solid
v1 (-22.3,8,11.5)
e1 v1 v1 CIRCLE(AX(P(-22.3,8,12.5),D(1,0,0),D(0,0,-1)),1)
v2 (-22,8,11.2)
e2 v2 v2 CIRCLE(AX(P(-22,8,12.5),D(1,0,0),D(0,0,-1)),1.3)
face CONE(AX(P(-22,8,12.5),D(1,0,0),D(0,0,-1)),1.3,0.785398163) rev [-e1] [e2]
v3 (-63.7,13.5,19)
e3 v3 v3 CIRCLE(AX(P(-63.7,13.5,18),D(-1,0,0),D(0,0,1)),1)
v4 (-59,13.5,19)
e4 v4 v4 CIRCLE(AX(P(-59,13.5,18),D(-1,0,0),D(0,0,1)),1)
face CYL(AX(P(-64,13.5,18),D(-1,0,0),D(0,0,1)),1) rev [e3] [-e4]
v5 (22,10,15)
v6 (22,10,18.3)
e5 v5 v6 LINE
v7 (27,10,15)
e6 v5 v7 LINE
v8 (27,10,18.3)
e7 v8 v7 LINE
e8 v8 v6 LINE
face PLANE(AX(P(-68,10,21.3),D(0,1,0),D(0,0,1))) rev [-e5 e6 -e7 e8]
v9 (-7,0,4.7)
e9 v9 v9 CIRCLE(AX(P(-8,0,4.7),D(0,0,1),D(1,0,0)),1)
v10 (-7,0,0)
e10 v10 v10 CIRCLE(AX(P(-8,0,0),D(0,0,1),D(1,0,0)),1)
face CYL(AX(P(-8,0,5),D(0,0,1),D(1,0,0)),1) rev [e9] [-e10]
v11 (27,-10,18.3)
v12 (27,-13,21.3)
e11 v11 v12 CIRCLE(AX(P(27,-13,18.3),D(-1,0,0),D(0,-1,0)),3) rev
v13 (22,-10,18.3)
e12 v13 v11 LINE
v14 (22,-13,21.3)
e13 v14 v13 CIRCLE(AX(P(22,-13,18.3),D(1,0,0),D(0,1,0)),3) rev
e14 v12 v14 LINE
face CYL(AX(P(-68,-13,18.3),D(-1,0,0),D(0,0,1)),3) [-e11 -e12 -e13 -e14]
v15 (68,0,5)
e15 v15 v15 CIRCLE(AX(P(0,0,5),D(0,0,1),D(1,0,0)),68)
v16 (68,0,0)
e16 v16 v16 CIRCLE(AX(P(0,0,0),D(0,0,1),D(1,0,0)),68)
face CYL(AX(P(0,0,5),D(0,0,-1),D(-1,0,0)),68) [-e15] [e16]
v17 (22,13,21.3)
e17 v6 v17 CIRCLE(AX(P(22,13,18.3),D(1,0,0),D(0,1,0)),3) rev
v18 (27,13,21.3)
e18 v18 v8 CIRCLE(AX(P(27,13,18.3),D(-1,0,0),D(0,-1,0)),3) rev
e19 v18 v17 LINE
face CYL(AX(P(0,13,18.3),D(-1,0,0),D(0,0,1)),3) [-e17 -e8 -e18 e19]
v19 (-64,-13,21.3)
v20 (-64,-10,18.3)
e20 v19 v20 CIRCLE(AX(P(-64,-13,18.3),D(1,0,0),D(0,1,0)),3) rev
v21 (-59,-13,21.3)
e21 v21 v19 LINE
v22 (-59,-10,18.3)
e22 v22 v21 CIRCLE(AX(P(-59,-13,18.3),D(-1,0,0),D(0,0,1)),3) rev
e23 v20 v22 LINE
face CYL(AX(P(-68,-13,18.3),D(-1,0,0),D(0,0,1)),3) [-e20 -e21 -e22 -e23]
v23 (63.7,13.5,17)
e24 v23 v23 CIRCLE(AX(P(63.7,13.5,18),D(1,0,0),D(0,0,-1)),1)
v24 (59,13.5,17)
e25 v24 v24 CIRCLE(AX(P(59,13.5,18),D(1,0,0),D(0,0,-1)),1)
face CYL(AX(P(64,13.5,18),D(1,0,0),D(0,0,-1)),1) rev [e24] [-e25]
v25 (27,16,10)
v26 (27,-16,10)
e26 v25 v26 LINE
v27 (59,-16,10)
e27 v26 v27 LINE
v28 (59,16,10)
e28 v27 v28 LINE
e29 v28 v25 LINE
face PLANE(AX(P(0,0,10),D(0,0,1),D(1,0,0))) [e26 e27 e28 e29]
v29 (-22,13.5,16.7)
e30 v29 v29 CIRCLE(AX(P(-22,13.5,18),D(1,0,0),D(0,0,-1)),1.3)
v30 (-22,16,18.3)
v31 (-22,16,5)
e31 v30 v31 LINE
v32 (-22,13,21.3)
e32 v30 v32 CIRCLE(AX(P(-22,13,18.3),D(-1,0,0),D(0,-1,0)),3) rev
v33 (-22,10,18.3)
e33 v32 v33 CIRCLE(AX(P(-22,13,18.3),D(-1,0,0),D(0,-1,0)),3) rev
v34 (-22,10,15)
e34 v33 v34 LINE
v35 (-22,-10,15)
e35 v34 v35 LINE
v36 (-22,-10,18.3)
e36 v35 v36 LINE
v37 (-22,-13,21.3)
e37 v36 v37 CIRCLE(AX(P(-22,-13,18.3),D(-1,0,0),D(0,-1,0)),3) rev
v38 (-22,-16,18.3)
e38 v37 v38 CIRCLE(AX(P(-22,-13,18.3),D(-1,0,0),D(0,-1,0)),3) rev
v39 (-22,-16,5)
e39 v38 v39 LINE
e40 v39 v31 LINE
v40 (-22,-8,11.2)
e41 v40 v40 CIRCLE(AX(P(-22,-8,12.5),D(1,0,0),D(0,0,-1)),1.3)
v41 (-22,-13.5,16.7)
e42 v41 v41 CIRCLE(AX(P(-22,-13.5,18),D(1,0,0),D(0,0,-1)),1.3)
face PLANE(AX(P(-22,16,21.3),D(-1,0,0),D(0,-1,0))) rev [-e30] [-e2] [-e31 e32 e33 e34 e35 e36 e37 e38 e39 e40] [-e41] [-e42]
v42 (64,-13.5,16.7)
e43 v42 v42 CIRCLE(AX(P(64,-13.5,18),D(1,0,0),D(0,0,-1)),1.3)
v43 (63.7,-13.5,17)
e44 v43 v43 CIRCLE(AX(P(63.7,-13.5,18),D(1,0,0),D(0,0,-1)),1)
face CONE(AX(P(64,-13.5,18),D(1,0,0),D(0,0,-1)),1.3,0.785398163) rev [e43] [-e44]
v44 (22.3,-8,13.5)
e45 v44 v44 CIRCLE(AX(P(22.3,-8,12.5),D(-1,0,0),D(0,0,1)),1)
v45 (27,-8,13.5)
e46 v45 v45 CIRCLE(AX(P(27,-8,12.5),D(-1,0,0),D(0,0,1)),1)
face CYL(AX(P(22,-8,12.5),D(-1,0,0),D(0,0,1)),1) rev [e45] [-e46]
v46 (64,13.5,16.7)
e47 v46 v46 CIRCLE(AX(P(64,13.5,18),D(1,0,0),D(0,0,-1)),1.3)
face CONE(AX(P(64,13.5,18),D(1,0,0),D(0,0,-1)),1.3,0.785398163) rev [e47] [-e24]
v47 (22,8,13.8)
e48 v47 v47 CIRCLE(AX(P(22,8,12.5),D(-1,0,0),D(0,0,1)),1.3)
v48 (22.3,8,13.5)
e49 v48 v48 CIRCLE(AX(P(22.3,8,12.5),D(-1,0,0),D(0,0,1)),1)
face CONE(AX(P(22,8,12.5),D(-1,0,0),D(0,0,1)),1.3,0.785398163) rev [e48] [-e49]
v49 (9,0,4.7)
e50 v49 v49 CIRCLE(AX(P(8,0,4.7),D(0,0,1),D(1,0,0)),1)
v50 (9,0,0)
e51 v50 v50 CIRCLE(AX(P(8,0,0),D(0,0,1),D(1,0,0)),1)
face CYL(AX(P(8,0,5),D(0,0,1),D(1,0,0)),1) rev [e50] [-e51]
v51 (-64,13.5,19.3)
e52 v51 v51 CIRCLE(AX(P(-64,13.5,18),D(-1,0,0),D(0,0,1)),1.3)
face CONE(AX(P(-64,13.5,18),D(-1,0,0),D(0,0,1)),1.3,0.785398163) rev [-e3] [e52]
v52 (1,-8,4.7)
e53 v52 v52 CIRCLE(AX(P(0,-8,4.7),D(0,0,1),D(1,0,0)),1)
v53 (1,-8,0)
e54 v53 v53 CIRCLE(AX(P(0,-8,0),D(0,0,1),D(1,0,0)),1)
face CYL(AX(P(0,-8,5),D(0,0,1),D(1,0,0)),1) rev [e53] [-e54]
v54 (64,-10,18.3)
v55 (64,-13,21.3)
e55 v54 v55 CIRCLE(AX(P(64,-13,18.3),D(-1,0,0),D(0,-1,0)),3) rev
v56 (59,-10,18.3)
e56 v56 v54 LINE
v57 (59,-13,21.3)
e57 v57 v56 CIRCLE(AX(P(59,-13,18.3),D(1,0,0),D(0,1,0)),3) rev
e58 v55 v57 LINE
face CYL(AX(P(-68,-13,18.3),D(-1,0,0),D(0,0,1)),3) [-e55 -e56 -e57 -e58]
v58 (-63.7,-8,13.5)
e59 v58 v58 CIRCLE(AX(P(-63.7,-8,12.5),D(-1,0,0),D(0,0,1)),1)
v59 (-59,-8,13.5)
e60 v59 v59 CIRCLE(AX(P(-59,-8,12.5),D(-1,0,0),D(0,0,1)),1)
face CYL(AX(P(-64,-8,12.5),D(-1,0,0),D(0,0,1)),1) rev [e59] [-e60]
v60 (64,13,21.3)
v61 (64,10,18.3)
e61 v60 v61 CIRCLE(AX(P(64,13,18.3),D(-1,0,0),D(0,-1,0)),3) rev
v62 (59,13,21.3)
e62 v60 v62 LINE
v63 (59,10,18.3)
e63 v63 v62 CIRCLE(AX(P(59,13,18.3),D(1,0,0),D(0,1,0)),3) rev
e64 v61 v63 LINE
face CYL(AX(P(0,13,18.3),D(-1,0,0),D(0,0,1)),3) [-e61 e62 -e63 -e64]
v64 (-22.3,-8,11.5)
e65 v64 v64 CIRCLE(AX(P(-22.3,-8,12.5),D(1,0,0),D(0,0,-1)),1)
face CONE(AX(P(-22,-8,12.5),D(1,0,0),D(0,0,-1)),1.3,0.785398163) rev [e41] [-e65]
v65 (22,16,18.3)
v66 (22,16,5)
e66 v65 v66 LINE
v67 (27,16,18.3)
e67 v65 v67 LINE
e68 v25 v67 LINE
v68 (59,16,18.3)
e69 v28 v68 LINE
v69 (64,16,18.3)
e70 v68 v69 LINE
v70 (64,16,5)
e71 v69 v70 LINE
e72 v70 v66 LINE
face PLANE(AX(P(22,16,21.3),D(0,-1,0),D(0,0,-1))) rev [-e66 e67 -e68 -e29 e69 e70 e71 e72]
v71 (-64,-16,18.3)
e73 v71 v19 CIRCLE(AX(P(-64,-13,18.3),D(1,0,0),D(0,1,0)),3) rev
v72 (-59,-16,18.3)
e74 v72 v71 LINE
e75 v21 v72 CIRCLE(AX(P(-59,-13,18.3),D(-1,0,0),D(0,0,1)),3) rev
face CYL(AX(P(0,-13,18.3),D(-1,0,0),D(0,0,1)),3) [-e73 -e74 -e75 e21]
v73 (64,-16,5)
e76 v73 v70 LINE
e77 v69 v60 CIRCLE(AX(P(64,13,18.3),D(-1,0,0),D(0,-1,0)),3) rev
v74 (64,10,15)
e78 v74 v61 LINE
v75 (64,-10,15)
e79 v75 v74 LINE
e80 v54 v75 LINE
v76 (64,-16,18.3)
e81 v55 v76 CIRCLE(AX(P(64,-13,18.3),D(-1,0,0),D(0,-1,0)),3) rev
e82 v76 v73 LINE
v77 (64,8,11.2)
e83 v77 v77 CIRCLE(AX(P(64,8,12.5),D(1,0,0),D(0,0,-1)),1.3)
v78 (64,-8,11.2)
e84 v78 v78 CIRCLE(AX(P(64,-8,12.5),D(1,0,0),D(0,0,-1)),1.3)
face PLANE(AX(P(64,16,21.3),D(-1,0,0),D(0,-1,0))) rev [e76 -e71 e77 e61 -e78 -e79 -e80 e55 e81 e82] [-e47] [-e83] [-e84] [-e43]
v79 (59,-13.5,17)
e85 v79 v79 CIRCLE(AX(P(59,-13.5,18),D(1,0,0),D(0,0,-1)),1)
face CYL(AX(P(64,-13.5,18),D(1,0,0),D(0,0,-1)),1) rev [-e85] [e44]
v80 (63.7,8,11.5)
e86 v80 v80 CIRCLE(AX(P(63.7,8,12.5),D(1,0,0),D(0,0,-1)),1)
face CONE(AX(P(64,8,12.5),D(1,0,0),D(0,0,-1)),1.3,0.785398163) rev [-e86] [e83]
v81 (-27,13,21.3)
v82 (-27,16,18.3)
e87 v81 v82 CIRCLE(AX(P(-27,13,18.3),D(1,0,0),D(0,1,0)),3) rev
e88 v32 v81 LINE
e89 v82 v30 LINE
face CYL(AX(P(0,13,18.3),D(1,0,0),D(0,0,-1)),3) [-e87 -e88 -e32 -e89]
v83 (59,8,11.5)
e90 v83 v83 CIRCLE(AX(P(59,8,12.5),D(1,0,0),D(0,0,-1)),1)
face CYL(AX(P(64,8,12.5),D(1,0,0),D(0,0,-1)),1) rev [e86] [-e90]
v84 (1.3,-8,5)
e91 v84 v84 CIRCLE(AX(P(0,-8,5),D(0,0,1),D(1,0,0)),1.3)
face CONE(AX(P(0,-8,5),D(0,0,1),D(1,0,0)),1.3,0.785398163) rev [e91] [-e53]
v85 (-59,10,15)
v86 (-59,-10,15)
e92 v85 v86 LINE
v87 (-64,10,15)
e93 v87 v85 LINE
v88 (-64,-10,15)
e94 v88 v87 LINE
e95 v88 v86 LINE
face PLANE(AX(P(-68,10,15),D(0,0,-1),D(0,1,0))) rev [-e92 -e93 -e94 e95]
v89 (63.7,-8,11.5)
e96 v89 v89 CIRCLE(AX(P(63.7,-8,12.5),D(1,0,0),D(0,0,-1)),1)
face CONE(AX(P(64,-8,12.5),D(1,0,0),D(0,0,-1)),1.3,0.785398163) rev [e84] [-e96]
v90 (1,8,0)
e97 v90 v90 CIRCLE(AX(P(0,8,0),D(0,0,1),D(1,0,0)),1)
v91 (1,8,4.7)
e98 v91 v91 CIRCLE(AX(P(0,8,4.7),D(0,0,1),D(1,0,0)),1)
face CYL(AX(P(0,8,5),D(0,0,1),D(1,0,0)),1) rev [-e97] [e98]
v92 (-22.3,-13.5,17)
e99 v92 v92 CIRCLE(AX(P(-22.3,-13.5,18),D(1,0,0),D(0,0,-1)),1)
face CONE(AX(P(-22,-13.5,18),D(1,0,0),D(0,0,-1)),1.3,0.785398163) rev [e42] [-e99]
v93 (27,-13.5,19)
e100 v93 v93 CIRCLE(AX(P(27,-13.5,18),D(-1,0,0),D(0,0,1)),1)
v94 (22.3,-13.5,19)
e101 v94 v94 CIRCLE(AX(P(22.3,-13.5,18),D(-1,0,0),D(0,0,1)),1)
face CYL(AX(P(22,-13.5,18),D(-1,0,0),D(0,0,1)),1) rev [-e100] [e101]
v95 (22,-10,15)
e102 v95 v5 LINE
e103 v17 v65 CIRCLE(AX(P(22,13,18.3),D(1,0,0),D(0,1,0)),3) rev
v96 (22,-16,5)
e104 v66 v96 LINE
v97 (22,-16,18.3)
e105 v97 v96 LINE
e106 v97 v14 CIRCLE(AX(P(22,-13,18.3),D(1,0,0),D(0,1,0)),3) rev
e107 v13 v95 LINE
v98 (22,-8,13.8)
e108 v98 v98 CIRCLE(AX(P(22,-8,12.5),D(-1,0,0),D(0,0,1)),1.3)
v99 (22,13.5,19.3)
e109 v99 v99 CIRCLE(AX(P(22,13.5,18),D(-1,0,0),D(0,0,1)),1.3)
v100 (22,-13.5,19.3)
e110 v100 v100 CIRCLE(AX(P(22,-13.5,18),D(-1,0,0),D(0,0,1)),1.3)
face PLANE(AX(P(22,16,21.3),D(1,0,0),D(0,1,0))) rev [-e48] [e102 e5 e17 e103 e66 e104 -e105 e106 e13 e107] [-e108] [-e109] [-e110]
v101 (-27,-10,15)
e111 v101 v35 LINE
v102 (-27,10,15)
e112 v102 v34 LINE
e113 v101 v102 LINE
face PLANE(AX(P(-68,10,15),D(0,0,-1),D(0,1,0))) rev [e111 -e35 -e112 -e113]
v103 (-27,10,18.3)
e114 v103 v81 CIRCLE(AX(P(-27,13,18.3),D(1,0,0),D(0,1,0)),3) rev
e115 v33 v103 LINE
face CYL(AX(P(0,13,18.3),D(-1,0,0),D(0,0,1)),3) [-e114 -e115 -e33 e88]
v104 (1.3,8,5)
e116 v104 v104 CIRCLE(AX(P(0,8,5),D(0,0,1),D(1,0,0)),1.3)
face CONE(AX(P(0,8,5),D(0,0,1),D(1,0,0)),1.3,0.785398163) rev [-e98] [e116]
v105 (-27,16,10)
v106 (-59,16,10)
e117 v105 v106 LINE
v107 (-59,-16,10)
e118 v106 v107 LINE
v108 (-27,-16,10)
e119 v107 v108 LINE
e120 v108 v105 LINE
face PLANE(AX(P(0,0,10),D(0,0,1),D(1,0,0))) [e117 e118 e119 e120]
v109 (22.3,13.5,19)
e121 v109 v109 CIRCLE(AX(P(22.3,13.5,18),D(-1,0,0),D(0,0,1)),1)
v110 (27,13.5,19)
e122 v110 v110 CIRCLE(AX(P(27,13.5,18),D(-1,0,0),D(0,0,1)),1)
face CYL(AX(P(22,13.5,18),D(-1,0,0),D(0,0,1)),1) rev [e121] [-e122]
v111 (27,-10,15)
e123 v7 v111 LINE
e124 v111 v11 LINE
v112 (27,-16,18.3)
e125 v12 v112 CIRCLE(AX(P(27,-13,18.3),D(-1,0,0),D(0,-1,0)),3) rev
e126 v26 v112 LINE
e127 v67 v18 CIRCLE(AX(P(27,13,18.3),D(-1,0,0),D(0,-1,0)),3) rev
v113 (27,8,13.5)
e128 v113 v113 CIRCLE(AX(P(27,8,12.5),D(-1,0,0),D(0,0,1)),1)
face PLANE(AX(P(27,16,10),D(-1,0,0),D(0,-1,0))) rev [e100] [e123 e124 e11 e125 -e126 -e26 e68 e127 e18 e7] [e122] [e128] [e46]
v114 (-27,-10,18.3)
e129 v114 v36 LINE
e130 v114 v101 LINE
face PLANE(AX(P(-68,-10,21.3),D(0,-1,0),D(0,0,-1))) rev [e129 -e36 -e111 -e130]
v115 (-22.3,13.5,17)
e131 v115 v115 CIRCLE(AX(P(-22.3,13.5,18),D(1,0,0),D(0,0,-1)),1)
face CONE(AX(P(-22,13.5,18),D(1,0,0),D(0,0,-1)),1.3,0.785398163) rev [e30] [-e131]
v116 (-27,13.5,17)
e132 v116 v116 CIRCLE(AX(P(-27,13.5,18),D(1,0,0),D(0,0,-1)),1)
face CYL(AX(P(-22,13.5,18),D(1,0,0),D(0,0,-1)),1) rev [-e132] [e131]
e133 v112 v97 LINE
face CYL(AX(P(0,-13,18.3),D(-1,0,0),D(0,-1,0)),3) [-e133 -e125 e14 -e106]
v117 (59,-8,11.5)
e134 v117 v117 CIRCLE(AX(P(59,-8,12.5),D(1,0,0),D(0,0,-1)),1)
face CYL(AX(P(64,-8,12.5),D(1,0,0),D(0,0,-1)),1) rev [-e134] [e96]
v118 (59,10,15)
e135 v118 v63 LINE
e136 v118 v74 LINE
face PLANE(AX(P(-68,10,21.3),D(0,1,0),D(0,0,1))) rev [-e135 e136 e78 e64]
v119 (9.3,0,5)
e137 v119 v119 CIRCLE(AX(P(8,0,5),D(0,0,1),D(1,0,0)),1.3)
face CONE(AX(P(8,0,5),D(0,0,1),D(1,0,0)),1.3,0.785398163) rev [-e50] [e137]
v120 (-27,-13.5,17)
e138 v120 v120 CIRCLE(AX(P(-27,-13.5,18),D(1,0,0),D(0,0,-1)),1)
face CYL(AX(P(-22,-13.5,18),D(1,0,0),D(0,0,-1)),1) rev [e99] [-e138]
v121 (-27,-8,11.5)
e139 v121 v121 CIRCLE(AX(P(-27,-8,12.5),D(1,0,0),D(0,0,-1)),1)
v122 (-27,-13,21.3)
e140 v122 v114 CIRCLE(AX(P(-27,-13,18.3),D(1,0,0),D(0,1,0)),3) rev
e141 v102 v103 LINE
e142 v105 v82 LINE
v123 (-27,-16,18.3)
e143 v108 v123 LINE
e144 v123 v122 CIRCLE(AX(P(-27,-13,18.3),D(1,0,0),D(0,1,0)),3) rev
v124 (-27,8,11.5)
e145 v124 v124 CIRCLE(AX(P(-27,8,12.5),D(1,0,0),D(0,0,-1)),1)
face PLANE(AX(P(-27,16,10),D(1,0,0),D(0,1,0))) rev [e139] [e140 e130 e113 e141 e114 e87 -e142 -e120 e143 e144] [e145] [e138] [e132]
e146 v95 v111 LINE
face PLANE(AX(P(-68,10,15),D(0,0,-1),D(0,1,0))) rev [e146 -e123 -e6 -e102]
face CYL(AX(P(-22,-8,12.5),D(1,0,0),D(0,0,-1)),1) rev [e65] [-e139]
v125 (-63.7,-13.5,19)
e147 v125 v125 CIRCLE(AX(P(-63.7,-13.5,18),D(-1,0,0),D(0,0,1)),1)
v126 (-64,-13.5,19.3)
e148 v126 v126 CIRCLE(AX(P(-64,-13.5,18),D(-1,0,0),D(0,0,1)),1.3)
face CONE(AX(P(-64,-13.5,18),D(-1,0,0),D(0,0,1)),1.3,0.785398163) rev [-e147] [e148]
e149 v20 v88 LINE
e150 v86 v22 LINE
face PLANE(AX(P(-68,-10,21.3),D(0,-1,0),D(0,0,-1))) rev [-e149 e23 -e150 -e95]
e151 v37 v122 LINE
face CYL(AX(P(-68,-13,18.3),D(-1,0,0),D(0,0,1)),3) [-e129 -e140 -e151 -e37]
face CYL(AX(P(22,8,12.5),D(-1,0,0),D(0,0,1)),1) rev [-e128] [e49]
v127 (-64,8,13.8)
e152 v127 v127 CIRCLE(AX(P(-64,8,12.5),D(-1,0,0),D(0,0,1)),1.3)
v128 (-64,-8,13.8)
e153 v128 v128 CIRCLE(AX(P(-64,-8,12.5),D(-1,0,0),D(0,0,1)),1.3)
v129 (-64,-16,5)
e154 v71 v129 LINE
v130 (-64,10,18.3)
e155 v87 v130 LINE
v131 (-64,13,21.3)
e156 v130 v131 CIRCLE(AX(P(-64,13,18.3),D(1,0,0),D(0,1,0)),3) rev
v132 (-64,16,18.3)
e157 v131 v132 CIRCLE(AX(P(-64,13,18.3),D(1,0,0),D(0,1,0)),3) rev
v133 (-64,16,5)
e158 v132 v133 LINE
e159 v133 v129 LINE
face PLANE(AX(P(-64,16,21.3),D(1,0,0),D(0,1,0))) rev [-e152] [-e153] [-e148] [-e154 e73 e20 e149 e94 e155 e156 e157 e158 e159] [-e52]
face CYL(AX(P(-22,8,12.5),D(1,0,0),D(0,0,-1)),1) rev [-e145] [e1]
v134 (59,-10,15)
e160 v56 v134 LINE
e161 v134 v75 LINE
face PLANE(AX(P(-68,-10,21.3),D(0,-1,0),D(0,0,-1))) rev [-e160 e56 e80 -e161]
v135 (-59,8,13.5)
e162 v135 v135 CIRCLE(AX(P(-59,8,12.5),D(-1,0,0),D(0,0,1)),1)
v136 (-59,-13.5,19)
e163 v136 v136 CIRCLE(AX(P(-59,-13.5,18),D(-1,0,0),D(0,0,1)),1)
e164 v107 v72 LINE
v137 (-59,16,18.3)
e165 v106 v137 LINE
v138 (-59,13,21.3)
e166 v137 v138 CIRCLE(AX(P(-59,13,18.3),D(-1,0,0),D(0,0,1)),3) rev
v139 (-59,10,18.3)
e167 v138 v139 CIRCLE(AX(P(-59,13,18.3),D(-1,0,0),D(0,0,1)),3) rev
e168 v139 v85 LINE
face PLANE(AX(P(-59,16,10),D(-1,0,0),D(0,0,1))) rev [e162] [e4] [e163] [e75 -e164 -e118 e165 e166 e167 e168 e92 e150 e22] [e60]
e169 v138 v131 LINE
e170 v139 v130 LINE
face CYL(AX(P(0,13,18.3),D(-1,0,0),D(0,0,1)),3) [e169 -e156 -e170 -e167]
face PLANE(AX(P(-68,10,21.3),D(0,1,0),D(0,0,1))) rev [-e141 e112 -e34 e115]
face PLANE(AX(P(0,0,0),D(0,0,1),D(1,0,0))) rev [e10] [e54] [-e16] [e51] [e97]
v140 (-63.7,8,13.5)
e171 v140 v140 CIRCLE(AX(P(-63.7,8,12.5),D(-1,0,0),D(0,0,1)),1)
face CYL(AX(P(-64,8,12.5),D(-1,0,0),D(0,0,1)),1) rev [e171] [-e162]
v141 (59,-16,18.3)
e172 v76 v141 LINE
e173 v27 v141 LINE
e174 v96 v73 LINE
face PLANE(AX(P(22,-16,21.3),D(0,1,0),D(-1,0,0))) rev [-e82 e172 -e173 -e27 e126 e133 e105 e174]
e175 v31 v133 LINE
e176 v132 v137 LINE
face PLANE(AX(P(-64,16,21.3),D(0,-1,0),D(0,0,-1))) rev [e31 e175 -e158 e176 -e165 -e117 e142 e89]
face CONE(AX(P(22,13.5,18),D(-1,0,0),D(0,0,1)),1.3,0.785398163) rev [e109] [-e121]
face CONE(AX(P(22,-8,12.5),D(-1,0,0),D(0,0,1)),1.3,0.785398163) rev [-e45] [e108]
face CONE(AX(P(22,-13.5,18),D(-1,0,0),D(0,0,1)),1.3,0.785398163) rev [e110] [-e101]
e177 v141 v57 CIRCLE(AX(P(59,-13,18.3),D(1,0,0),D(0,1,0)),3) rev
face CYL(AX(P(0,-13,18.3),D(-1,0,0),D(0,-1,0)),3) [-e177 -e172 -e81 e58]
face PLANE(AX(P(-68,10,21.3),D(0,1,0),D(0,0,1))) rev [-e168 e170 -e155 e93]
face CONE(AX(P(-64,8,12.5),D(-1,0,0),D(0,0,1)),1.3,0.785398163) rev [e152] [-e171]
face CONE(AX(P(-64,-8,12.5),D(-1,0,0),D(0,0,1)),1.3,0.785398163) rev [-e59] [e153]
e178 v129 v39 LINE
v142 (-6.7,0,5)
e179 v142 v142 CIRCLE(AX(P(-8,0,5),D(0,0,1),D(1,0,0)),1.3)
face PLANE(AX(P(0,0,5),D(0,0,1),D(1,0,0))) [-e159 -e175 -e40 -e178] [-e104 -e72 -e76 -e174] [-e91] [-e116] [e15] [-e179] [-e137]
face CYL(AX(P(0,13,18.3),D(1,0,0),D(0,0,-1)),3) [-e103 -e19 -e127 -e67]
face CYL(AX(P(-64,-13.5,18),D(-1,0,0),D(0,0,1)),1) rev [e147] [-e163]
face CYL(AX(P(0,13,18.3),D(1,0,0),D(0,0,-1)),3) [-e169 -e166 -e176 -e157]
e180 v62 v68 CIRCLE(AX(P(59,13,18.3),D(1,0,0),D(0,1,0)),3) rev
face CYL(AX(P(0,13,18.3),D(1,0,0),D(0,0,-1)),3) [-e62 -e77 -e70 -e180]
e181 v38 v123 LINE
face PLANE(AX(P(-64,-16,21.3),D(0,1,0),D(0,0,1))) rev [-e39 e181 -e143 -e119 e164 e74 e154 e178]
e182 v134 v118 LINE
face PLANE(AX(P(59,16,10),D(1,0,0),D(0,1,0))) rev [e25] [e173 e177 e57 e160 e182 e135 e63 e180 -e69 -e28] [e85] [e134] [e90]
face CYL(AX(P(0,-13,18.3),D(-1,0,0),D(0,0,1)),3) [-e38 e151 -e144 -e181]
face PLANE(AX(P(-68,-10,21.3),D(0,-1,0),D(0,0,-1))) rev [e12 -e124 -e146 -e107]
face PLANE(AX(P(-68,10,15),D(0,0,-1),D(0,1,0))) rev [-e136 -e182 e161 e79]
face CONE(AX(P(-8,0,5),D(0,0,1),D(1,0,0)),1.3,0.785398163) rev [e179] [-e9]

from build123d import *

# Parameters (mm, degrees)
IZIM1_R                                        = 68
Y_KSEKLIK_EKSTR_ZYON1_DEPTH                    = 5
IZIM2_W                                        = 42
IZIM2_H                                        = 32
Y_KSEKLIK_EKSTR_ZYON2_DEPTH                    = 16.3
IZIM3_W                                        = 32
IZIM3_H                                        = 32
KES_EKSTR_ZYON1_DEPTH                          = 11.3
M2_D_Z_BA_L_MAKINE_VIDAS_IN_HAV_A2_D           = 2
M2_D_Z_BA_L_MAKINE_VIDAS_IN_HAV_A2_CSINK_D     = 2.6
M2_D_Z_BA_L_MAKINE_VIDAS_IN_HAV_A2_CSINK_ANGLE = 90
IZIM9_W                                        = 6.3
IZIM9_H                                        = 20
KES_EKSTR_ZYON2_DEPTH                          = 151.005633228
RADYUS1_R                                      = 3
M2_D_Z_BA_L_MAKINE_VIDAS_IN_HAV_A3_D           = 2
M2_D_Z_BA_L_MAKINE_VIDAS_IN_HAV_A3_DEPTH       = 5
M2_D_Z_BA_L_MAKINE_VIDAS_IN_HAV_A3_CSINK_D     = 2.6
M2_D_Z_BA_L_MAKINE_VIDAS_IN_HAV_A3_CSINK_ANGLE = 90
AYNALAMA2_COPY_1_D                             = 2
AYNALAMA2_COPY_1_DEPTH                         = 5
AYNALAMA2_COPY_1_CSINK_D                       = 2.6
AYNALAMA2_COPY_1_CSINK_ANGLE                   = 90


with BuildPart() as part:
    # Çizim1 → Yükseklik-Ekstrüzyon1 (new body)
    with BuildSketch(Plane.XY):
        Circle(IZIM1_R)
    extrude(amount=Y_KSEKLIK_EKSTR_ZYON1_DEPTH)

    # Çizim2 → Yükseklik-Ekstrüzyon2 (add)
    with BuildSketch(Plane.XY.offset(5)):
        with Locations((-43, 0)):
            Rectangle(IZIM2_W, IZIM2_H)
        with Locations((43, 0)):
            Rectangle(IZIM2_W, IZIM2_H)
    extrude(amount=Y_KSEKLIK_EKSTR_ZYON2_DEPTH)

    # Çizim3 → Kes-Ekstrüzyon1 (cut)
    with BuildSketch(Plane.XY.offset(21.3)):
        with Locations((-43, 0)):
            Rectangle(IZIM3_W, IZIM3_H)
        with Locations((43, 0)):
            Rectangle(IZIM3_W, IZIM3_H)
    extrude(amount=-KES_EKSTR_ZYON1_DEPTH, mode=Mode.SUBTRACT)

    # M2 Düz Başlı Makine Vidası İçin Havşa2 (through all)
    with Locations(Plane(origin=(0, 8, 5), x_dir=(1, 0, 0), z_dir=(0, 0, 1))):
        with Locations((0, 0), (8, -8), (0, -16), (-8, -8)):
            CounterSinkHole(M2_D_Z_BA_L_MAKINE_VIDAS_IN_HAV_A2_D / 2, M2_D_Z_BA_L_MAKINE_VIDAS_IN_HAV_A2_CSINK_D / 2, counter_sink_angle=M2_D_Z_BA_L_MAKINE_VIDAS_IN_HAV_A2_CSINK_ANGLE)

    # Çizim9 → Kes-Ekstrüzyon2 (cut, through all)
    with BuildSketch(Plane(origin=(64, 0, 0), x_dir=(0, 0, -1), z_dir=(1, 0, 0))):
        with Locations((-18.15, 0)):
            Rectangle(IZIM9_W, IZIM9_H)
    extrude(amount=-KES_EKSTR_ZYON2_DEPTH, mode=Mode.SUBTRACT)

    # Radyus1
    radyus1_edges = [part.edges().sort_by_distance(p)[0] for p in [
        (-61.5, 10, 21.3),
        (-61.5, 16, 21.3),
        (61.5, -16, 21.3),
        (61.5, -10, 21.3),
        (24.5, -16, 21.3),
        (24.5, -10, 21.3),
        (61.5, 10, 21.3),
        (24.5, 10, 21.3),
        (24.5, 16, 21.3),
        (61.5, 16, 21.3),
        (-24.5, 10, 21.3),
        (-24.5, 16, 21.3),
        (-24.5, -16, 21.3),
        (-24.5, -10, 21.3),
        (-61.5, -16, 21.3),
        (-61.5, -10, 21.3),
    ]]
    fillet(radyus1_edges, radius=RADYUS1_R - 0.0001)  # a hair under: the kernel refuses the full size

    # M2 Düz Başlı Makine Vidası İçin Havşa3
    with Locations(Plane(origin=(64, 13.5, 18), x_dir=(0, 1, 0), z_dir=(1, 0, 0))):
        with Locations((0, 0), (-5.5, -5.5), (-21.5, -5.5), (-27, 0)):
            m2_d_z_ba_l_makine_vidas_in_hav_a3 = CounterSinkHole(M2_D_Z_BA_L_MAKINE_VIDAS_IN_HAV_A3_D / 2, M2_D_Z_BA_L_MAKINE_VIDAS_IN_HAV_A3_CSINK_D / 2, depth=M2_D_Z_BA_L_MAKINE_VIDAS_IN_HAV_A3_DEPTH, counter_sink_angle=M2_D_Z_BA_L_MAKINE_VIDAS_IN_HAV_A3_CSINK_ANGLE)

    # Aynalama1: M2 Düz Başlı Makine Vidası İçin Havşa3 across plane
    add(m2_d_z_ba_l_makine_vidas_in_hav_a3.mirror(Plane(origin=(43, 0, 0), x_dir=(0, 0, 1), z_dir=(1, 0, 0))), mode=Mode.SUBTRACT)

    # Aynalama2: M2 Düz Başlı Makine Vidası İçin Havşa3 across plane
    add(m2_d_z_ba_l_makine_vidas_in_hav_a3.mirror(Plane(origin=(0, 0, 0), x_dir=(0, 0, 1), z_dir=(1, 0, 0))), mode=Mode.SUBTRACT)

    # Aynalama2 copy 1
    with Locations(Plane(origin=(-22, 13.5, 18), x_dir=(0, 1, 0), z_dir=(1, 0, 0))):
        with Locations((0, 0), (-5.5, -5.5), (-21.5, -5.5), (-27, 0)):
            CounterSinkHole(AYNALAMA2_COPY_1_D / 2, AYNALAMA2_COPY_1_CSINK_D / 2, depth=AYNALAMA2_COPY_1_DEPTH, counter_sink_angle=AYNALAMA2_COPY_1_CSINK_ANGLE)


solid = part.part
